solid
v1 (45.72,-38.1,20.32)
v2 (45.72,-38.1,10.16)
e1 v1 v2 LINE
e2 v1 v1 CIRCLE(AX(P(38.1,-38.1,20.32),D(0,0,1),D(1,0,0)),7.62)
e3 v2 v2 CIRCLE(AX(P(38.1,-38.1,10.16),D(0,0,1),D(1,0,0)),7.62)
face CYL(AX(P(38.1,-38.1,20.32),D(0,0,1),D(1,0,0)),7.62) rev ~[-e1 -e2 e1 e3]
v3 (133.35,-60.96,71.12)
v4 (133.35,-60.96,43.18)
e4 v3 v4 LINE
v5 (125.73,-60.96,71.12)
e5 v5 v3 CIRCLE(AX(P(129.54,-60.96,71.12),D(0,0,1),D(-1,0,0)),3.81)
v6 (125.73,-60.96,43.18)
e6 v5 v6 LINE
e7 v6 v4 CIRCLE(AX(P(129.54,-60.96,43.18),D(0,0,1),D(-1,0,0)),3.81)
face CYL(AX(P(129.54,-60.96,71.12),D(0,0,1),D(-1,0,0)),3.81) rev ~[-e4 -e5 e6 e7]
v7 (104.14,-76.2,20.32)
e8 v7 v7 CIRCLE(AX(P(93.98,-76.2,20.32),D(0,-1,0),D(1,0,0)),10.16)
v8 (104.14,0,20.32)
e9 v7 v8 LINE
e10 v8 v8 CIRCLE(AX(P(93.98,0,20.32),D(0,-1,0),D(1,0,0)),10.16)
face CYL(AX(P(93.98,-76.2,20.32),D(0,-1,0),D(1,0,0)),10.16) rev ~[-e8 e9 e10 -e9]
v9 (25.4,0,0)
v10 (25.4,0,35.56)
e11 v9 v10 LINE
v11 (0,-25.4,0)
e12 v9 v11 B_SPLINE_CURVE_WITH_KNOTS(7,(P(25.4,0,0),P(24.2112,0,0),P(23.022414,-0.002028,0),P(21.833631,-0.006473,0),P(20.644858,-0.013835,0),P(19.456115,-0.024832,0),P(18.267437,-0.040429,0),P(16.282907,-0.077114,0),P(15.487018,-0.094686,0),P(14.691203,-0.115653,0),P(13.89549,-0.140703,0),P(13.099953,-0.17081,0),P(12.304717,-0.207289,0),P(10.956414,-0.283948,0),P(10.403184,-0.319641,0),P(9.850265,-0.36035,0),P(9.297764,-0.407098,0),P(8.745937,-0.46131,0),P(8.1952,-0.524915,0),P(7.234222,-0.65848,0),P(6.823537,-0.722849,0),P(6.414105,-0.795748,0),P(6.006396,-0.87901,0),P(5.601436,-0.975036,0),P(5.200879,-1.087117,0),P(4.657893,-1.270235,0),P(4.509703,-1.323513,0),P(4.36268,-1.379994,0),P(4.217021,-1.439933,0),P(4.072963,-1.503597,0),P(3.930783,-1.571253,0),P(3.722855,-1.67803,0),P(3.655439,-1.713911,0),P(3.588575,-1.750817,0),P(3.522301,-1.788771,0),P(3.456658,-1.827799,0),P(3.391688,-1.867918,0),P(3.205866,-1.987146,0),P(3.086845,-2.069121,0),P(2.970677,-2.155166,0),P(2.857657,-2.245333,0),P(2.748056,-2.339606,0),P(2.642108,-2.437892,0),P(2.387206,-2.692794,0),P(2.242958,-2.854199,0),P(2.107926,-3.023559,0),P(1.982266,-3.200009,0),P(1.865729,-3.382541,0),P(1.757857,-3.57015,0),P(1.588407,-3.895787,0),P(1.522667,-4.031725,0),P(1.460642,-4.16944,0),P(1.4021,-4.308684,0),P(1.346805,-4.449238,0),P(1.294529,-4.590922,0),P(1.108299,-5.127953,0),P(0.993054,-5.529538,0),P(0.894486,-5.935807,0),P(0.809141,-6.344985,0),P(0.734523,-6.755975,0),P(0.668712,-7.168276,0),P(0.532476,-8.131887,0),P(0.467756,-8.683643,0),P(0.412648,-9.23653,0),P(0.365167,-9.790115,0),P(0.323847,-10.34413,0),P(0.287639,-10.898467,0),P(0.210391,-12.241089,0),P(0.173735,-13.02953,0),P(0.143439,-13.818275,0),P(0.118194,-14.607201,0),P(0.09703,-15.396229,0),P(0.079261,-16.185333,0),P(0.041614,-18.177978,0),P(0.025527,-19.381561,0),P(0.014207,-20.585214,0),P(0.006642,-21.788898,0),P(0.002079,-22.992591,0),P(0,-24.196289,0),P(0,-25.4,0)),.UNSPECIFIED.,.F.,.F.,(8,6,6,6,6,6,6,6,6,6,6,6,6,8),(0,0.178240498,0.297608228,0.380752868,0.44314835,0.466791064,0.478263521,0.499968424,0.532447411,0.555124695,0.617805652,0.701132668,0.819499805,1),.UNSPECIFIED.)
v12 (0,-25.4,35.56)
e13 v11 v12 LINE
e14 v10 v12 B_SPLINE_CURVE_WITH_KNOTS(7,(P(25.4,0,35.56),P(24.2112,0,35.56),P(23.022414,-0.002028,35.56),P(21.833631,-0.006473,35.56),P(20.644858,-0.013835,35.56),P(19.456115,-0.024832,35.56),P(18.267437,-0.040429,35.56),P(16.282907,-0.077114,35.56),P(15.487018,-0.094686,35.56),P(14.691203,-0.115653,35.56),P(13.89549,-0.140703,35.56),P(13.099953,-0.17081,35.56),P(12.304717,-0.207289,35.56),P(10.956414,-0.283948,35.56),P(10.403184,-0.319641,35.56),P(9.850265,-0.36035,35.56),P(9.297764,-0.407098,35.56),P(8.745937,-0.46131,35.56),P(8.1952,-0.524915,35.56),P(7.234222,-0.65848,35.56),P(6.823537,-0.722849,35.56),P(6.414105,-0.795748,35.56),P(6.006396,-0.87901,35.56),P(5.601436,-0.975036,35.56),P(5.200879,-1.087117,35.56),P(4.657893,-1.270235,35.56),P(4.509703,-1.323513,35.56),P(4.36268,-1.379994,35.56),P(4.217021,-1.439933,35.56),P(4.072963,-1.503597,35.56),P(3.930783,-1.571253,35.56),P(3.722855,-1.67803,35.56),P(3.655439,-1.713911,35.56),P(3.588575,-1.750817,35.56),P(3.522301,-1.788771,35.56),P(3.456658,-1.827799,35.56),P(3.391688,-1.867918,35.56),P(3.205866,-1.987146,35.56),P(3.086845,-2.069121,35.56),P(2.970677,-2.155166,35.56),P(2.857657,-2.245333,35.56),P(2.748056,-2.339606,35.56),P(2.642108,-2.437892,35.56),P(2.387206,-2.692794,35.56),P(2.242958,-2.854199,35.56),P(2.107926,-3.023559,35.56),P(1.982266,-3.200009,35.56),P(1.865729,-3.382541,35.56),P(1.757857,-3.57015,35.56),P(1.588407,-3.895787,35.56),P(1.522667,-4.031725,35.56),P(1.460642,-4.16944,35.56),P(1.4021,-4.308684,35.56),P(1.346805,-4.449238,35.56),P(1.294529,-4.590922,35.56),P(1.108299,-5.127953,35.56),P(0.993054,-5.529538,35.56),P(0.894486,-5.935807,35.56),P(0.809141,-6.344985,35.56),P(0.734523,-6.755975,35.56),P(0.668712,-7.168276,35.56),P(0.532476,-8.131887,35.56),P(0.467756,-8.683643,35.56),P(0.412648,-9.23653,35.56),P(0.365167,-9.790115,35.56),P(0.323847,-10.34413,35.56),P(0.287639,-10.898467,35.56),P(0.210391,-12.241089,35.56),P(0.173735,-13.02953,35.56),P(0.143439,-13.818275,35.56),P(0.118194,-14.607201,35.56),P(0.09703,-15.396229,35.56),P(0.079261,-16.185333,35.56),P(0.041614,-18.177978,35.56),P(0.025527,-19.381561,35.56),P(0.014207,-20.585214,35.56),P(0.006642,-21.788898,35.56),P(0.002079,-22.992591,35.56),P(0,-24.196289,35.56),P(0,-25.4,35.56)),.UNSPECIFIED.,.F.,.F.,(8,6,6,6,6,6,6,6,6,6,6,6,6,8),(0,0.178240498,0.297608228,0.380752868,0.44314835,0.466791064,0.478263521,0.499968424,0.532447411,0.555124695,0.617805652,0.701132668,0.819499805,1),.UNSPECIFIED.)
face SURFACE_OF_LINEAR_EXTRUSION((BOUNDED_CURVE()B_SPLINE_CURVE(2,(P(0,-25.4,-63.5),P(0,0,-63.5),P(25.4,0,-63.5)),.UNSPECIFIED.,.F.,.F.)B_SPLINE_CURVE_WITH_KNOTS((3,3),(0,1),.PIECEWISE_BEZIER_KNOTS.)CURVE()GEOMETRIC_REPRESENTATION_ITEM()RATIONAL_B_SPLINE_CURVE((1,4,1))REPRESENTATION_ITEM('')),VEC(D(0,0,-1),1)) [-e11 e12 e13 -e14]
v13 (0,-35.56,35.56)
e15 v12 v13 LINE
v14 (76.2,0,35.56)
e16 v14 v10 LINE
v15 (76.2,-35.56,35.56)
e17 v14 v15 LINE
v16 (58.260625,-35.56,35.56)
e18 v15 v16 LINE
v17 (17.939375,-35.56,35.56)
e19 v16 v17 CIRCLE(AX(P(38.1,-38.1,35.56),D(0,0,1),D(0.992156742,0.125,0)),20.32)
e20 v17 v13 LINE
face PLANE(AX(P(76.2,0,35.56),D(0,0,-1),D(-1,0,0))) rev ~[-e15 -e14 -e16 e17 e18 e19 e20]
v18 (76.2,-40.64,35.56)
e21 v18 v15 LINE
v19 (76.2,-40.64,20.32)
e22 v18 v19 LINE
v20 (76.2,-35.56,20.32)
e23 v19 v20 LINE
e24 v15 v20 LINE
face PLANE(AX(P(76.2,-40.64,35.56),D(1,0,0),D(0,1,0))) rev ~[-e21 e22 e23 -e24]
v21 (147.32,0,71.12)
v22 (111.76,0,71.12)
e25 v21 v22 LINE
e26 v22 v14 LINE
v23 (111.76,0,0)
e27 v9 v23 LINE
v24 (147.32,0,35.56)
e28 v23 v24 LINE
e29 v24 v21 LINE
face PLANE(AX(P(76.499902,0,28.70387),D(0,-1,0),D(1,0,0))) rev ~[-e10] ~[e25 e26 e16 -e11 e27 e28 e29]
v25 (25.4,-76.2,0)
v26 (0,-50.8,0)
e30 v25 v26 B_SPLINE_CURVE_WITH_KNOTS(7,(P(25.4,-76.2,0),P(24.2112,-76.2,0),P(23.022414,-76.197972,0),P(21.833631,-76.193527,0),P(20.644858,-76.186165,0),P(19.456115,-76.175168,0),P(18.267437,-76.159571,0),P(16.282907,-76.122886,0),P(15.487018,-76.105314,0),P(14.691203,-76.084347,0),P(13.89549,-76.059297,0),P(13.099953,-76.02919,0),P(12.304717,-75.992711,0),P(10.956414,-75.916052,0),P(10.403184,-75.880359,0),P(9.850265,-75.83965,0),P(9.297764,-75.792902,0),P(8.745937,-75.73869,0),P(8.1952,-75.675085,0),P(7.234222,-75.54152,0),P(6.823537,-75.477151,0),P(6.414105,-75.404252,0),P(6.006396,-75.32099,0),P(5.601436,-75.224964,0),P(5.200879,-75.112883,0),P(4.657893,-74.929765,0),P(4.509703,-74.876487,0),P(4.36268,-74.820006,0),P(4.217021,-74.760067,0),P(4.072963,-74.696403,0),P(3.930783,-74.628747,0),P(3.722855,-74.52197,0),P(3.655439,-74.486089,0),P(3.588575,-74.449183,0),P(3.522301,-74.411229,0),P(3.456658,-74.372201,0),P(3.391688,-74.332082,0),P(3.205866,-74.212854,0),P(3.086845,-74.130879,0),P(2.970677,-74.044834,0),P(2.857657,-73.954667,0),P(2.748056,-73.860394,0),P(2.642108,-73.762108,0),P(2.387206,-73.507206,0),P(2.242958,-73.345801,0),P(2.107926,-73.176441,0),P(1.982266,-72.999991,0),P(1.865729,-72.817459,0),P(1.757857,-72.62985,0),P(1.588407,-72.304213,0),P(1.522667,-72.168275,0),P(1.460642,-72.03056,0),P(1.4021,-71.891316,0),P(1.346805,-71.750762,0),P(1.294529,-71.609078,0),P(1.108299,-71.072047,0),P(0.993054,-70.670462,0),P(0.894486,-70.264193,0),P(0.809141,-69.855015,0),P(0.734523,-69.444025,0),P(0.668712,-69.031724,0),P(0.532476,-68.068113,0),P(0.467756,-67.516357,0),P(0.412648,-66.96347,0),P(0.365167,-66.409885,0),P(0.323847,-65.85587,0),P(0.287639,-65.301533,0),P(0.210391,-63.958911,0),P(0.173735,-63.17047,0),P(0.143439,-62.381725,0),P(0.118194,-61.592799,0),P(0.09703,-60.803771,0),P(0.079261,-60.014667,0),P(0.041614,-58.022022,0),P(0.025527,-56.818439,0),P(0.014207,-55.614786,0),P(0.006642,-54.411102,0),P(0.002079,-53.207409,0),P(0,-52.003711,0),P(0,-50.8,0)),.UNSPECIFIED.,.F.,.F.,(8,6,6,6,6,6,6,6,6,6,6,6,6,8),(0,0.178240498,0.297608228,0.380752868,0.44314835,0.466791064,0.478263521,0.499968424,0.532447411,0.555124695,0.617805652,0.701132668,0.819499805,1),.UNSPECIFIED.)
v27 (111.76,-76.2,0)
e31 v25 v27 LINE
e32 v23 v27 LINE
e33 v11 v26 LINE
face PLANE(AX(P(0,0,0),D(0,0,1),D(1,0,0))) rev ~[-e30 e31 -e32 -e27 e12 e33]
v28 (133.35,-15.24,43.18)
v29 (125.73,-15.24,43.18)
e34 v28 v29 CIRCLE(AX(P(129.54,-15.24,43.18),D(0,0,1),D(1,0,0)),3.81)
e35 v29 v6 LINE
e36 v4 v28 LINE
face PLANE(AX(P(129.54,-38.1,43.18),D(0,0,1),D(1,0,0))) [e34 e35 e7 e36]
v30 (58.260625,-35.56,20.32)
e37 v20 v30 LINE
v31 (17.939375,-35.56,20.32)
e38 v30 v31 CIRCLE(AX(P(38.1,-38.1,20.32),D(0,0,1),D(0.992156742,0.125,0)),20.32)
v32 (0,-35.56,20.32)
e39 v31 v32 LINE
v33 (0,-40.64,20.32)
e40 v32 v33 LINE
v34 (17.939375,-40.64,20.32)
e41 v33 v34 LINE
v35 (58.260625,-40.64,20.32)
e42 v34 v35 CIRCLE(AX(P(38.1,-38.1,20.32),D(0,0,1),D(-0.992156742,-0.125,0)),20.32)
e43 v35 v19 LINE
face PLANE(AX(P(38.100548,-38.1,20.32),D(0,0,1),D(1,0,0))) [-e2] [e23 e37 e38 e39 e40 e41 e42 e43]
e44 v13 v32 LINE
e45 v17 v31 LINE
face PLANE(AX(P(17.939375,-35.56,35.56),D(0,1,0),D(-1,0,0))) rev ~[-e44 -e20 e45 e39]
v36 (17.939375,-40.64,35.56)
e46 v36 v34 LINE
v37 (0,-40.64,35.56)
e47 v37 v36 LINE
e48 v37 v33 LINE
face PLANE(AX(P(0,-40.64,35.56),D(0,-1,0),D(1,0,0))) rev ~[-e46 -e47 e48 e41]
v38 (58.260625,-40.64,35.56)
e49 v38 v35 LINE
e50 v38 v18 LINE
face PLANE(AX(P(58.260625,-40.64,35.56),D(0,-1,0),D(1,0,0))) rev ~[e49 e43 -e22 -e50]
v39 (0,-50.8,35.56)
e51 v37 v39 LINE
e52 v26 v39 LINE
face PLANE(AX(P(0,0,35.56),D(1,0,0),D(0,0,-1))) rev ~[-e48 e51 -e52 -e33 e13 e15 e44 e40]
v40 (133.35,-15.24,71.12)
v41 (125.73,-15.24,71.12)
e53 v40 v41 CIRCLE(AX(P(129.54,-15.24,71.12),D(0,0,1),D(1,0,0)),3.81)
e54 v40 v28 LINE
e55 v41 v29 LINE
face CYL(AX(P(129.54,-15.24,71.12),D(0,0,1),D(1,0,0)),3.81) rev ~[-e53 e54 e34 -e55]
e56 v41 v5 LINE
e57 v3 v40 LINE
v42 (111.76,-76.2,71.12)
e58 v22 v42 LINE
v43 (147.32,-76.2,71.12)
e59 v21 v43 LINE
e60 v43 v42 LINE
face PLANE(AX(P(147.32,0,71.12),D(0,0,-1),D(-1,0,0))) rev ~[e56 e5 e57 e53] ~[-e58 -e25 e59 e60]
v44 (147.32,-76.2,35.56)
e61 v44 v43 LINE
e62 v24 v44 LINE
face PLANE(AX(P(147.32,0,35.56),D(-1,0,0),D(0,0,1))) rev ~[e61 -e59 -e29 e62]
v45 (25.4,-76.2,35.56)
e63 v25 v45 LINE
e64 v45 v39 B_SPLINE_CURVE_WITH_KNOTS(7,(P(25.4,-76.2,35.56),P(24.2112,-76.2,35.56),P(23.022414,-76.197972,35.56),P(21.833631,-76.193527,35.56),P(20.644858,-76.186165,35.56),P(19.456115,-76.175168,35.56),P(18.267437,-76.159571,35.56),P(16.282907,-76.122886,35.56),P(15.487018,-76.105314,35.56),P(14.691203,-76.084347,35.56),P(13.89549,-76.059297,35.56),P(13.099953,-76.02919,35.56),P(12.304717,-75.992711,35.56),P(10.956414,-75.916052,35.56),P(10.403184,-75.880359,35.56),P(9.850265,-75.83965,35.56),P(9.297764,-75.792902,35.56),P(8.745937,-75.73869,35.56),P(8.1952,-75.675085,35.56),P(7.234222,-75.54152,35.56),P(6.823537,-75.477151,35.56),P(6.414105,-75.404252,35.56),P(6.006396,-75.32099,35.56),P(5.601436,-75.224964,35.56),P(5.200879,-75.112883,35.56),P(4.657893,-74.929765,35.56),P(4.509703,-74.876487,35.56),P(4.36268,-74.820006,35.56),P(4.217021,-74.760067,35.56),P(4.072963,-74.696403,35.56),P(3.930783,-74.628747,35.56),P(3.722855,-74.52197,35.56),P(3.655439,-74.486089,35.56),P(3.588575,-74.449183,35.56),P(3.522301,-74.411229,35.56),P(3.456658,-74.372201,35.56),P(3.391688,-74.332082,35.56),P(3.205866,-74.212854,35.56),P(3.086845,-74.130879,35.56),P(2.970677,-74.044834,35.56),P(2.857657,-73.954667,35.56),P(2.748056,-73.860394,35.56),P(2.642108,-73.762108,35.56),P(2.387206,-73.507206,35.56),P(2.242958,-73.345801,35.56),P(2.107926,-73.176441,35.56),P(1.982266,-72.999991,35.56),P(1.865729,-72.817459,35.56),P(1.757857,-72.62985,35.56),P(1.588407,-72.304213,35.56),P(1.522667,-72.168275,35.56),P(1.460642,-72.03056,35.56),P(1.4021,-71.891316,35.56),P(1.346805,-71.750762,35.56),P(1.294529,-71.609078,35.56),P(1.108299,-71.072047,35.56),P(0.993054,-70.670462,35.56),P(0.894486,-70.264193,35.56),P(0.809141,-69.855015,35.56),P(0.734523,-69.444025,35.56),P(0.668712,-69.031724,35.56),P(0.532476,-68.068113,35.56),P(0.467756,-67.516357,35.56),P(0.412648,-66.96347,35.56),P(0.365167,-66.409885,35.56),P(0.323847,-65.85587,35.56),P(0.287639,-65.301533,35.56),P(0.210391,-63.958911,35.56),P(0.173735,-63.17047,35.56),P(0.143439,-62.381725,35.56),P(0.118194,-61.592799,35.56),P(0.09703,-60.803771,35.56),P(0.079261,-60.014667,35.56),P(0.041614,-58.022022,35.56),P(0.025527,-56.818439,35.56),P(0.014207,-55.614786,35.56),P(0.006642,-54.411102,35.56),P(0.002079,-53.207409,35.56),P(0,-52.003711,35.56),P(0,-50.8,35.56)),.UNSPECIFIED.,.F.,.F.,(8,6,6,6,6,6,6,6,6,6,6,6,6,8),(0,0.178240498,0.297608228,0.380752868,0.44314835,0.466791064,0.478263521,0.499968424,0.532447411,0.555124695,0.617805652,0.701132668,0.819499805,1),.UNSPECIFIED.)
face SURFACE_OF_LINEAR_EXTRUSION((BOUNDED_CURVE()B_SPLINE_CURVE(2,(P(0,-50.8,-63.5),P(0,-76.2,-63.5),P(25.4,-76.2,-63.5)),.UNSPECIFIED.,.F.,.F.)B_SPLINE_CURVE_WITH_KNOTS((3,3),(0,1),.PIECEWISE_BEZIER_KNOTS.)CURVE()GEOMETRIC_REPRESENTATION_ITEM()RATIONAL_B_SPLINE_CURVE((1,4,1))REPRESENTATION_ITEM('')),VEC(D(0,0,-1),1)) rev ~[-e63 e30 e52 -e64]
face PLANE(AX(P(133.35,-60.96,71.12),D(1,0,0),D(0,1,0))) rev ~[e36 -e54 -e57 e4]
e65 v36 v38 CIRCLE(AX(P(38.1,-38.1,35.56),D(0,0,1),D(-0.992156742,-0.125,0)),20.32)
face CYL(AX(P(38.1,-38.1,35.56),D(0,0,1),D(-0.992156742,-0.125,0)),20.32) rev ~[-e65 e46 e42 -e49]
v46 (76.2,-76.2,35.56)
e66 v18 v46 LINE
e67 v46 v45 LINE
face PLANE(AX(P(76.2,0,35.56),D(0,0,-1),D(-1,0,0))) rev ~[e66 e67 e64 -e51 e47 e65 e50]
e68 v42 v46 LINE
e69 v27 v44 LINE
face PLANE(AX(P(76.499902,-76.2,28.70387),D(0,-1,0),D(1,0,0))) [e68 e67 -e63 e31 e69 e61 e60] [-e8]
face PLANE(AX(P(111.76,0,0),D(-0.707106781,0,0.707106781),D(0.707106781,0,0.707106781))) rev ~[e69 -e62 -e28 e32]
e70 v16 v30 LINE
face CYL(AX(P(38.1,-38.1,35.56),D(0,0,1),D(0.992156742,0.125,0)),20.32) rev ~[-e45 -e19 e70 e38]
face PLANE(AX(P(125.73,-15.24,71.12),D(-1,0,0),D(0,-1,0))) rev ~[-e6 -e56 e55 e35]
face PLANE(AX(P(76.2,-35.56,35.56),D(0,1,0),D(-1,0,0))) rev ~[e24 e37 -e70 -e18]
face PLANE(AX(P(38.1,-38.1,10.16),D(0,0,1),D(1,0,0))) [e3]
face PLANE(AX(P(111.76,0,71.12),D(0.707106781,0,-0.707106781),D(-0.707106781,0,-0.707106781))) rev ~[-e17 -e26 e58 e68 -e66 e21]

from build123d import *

# Parameters (mm, degrees)
F1_DEPTH     = 76.2
F2_R         = 10.16
F3_DEPTH     = 76.2
F5_DEPTH     = 27.94
F7_DEPTH     = 15.24
F8_R         = 7.62
F9_DEPTH     = 10.16
F10_T1_DEPTH = 162.56
F11_T1_DEPTH = 162.56


# Not quite as in the source:
# - a fillet or chamfer that OpenCascade refuses, or shapes differently, is made with other operations: its cross-section is extruded or revolved along the edge and cut away or added


with BuildPart() as f1:
    # F0 (on Front) → F1 (new body)
    with BuildSketch(Plane.XZ):
        Polygon((0, 35.56), (0, 0), (111.76, 0), (147.32, 35.56), (147.32, 71.12), (111.76, 71.12), (76.2, 35.56), align=None)
    extrude(amount=F1_DEPTH)

    # F2 (on face) → F3 (cut)
    with BuildSketch(Plane.XZ.offset(76.2)):
        with Locations((93.98, 20.32)):
            Circle(F2_R)
    extrude(amount=-F3_DEPTH, mode=Mode.SUBTRACT)

    # F4 (on face) → F5 (cut)
    with BuildSketch(Plane.XY.offset(71.12)):
        with BuildLine():
            ThreePointArc((133.35, -15.24), (129.54, -11.43), (125.73, -15.24))
            Line((125.73, -15.24), (125.73, -60.96))
            ThreePointArc((125.73, -60.96), (129.54, -64.77), (133.35, -60.96))
            Line((133.35, -60.96), (133.35, -15.24))
        make_face()
    extrude(amount=-F5_DEPTH, mode=Mode.SUBTRACT)

    # F6 (on face) → F7 (cut)
    with BuildSketch(Plane.XY.offset(35.56)):
        with BuildLine():
            ThreePointArc((58.2606249903, -40.64), (58.3801171077, -39.3724975829), (58.42, -38.1))
            ThreePointArc((58.42, -38.1), (58.3801171077, -36.8275024171), (58.2606249903, -35.56))
            ThreePointArc((58.2606249903, -35.56), (38.1, -17.78), (17.9393750097, -35.56))
            ThreePointArc((17.9393750097, -35.56), (17.78, -38.1), (17.9393750097, -40.64))
            ThreePointArc((17.9393750097, -40.64), (38.1, -58.42), (58.2606249903, -40.64))
        make_face()
        with BuildLine():
            ThreePointArc((58.2606249903, -35.56), (58.3801171077, -36.8275024171), (58.42, -38.1))
            ThreePointArc((58.42, -38.1), (58.3801171077, -39.3724975829), (58.2606249903, -40.64))
            Line((58.2606249903, -40.64), (76.2, -40.64))
            Line((76.2, -40.64), (76.2, -35.56))
            Line((76.2, -35.56), (58.2606249903, -35.56))
        make_face()
        with BuildLine():
            ThreePointArc((17.9393750097, -40.64), (17.78, -38.1), (17.9393750097, -35.56))
            Line((17.9393750097, -35.56), (0, -35.56))
            Line((0, -35.56), (0, -40.64))
            Line((0, -40.64), (17.9393750097, -40.64))
        make_face()
    extrude(amount=-F7_DEPTH, mode=Mode.SUBTRACT)

    # F8 (on face) → F9 (cut)
    with BuildSketch(Plane.XY.offset(20.32)):
        with Locations((38.1, -38.1)):
            Circle(F8_R)
    extrude(amount=-F9_DEPTH, mode=Mode.SUBTRACT)

    # F10: fillet of radius 25.4 on 1 edges, made by hand

    # F10_s2 → F10_t1 (cut)
    with BuildSketch(Plane.XY.offset(-63.5)):
        with BuildLine():
            add(Edge.make_bspline(
                [(0, -50.8), (0, -76.2), (25.4, -76.2)],
                knots=[0, 0, 0, 1, 1, 1], degree=2, weights=[1, 4, 1]))
            Line((25.4, -76.2), (0, -76.2))
            Line((0, -76.2), (0, -50.8))
        make_face()
    extrude(amount=F10_T1_DEPTH, mode=Mode.SUBTRACT)

    # F11: fillet of radius 25.4 on 1 edges, made by hand

    # F11_s2 → F11_t1 (cut)
    with BuildSketch(Plane.XY.offset(-63.5)):
        with BuildLine():
            add(Edge.make_bspline(
                [(0, -25.4), (0, 0), (25.4, 0)],
                knots=[0, 0, 0, 1, 1, 1], degree=2, weights=[1, 4, 1]))
            Line((25.4, 0), (0, 0))
            Line((0, 0), (0, -25.4))
        make_face()
    extrude(amount=F11_T1_DEPTH, mode=Mode.SUBTRACT)


solid = f1.part
